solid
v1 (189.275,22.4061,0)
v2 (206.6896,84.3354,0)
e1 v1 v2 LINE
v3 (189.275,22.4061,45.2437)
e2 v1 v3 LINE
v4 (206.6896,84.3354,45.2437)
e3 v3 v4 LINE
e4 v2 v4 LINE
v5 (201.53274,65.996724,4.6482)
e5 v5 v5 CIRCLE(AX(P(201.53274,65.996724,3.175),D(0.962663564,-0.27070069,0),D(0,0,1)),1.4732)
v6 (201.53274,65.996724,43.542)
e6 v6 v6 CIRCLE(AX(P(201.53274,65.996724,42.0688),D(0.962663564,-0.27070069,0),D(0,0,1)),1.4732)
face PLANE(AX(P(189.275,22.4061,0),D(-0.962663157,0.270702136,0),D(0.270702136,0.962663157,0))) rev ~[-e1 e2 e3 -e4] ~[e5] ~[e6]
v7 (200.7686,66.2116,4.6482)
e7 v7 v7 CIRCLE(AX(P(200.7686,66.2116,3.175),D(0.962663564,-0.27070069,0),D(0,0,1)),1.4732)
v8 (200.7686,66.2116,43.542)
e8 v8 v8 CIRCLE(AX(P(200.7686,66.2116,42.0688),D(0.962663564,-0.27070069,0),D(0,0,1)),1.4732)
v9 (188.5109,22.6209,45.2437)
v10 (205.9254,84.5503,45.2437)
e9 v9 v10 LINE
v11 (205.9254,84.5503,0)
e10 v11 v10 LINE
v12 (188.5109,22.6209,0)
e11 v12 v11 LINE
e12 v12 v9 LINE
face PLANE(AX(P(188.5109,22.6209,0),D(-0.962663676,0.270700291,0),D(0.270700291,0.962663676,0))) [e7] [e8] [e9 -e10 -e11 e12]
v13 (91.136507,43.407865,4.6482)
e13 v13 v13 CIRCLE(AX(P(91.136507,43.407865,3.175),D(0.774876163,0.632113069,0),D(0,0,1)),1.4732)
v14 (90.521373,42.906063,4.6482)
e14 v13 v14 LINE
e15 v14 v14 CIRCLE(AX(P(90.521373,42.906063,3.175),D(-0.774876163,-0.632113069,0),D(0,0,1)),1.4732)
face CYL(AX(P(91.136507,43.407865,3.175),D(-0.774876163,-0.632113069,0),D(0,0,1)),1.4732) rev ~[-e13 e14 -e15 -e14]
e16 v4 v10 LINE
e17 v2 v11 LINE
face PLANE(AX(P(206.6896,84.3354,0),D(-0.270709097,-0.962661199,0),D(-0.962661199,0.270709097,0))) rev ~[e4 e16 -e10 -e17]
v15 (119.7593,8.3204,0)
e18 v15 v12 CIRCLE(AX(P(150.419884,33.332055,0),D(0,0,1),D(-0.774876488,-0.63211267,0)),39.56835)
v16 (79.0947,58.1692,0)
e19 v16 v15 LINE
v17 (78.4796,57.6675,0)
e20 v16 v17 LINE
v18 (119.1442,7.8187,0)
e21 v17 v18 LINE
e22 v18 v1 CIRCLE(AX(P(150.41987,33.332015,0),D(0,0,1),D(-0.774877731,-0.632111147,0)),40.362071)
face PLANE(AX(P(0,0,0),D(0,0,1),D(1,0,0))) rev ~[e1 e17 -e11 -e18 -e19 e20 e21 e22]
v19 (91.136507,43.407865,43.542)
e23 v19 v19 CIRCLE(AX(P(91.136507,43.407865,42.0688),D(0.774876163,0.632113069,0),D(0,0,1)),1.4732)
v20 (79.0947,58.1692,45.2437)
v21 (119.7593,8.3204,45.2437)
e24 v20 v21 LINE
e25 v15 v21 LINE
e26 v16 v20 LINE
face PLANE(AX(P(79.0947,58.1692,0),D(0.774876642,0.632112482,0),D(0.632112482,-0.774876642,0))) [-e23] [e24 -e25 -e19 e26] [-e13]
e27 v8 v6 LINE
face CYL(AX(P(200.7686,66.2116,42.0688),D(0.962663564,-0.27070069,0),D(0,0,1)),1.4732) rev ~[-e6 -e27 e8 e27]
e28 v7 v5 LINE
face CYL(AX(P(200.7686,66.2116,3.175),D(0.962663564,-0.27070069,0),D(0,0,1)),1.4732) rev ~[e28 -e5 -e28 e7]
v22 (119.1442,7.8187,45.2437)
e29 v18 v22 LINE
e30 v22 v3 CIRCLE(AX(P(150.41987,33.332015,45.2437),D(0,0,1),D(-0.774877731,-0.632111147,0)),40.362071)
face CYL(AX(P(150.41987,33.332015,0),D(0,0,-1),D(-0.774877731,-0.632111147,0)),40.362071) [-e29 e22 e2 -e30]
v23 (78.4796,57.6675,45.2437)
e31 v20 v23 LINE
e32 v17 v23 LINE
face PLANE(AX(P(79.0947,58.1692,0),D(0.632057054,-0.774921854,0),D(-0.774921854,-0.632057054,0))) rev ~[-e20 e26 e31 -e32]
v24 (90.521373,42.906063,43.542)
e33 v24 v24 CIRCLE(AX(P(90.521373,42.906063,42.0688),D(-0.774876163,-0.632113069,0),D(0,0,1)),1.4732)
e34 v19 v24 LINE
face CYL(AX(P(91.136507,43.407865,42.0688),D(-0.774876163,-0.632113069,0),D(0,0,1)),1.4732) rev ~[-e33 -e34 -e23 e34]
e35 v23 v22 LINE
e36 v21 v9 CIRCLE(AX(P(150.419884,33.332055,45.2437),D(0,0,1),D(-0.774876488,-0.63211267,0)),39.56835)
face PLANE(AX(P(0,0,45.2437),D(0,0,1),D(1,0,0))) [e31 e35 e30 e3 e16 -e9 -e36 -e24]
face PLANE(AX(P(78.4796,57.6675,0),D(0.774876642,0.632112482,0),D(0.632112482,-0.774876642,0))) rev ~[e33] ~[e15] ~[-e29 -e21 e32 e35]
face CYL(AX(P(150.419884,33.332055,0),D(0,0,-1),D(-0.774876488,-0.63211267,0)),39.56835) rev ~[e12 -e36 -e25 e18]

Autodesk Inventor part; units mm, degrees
ref_plane "YZ Plane" through (0, 0, 0) normal (1, 0, 0) x (0, 1, 0)
ref_plane "XZ Plane" through (0, 0, 0) normal (0, 1, 0) x (-1, 0, 0)
sketch "Main Outline" plane through (0, 0, 0) normal (0, 0, 1) x (1, 0, 0)
  line L0 (0, 0) -> (304.8, 0) construction
  line L1 (304.8, 0) -> (304.8, 50.8) construction
  line L2 (304.8, 50.8) -> (0, 50.8) construction
  line L3 (0, 50.8) -> (0, 0) construction
  line L4 (0, 50.8) -> (0, 53.34) construction
  line L5 (0, 53.34) -> (304.8, 53.34) construction
  line L6 (304.8, 53.34) -> (304.8, 50.8) construction
  circle A0 centre (152.4, 23.8125) radius 17.4625 construction
  line L7 (152.4, 23.8125) -> (152.4, 0) construction
  circle A1 centre (152.4, 23.8125) radius 27.94 construction
  circle A2 centre (152.4, 23.8125) radius 21.59 construction
  line L8 (152.4, 23.8125) -> (144.7964, 60.3681) construction
  circle A3 centre (144.7964, 60.3681) radius 15.24 construction
  circle A4 centre (144.7964, 60.3681) radius 8.89 construction
  circle A5 centre (144.7964, 60.3681) radius 14.2875 construction
  arc A6 (164.6591, 71.8014) -> (129.0153, 43.7486) centre (144.7964, 60.3681) ccw construction
  circle A7 centre (98.8106, 85.598) radius 32.258 construction
  circle A8 centre (126.6733, 147.4971) radius 32.258 construction
  circle A9 centre (176.9075, 101.8424) radius 32.258 construction
  circle A10 centre (144.7964, 60.3681) radius 11.1125 construction
  circle A11 centre (152.4, 23.8125) radius 49.53 construction
  line L9 (144.7964, 60.3681) -> (126.6733, 147.4971) construction
  line L10 (144.7964, 60.3681) -> (98.8106, 85.598) construction
  line L11 (98.8106, 85.598) -> (176.9075, 101.8424) construction
  line L12 (176.9075, 101.8424) -> (144.7964, 60.3681) construction
  circle A12 centre (98.8106, 85.598) radius 9.5493 construction
  arc A13 (174.9629, 111.1915) -> (185.6989, 98.1139) centre (176.9075, 101.8424) ccw construction
  circle A14 centre (126.6733, 147.4971) radius 9.5493 construction
  line L13 (96.8659, 94.9472) -> (174.9629, 111.1915) construction
  line L14 (185.6989, 98.1139) -> (165.8956, 51.4198) construction
  line L15 (92.2351, 78.6732) -> (129.0153, 43.7486) construction
  line L16 (174.9629, 111.1915) -> (176.9075, 101.8424) construction
  line L17 (176.9075, 101.8424) -> (185.6989, 98.1139) construction
  arc A15 (185.6989, 98.1139) -> (174.9629, 111.1915) centre (176.9075, 101.8424) ccw construction
  arc A16 (165.8956, 51.4198) -> (164.6591, 71.8014) centre (144.7964, 60.3681) ccw construction
  arc A17 (129.0153, 43.7486) -> (165.8956, 51.4198) centre (144.7964, 60.3681) ccw construction
  circle A18 centre (126.6086, 147.808) radius 32.258 construction
  circle A19 centre (126.544, 148.1188) radius 32.258 construction
  circle A20 centre (126.4793, 148.4297) radius 32.258 construction
  line L18 (126.6733, 147.4971) -> (126.4793, 148.4297) construction
  circle A21 centre (126.738, 147.1863) radius 32.258 construction
  circle A22 centre (117.4622, 43.2997) radius 9.525 construction
  circle A23 centre (176.6694, 55.615) radius 9.525 construction
  line L19 (152.4, 23.8125) -> (117.4622, 43.2997) construction
  line L20 (152.4, 23.8125) -> (176.6694, 55.615) construction
  line L21 (117.4622, 43.2997) -> (98.8106, 85.598) construction
  line L22 (176.6694, 55.615) -> (176.9075, 101.8424) construction
  circle A24 centre (135.1821, 106.5897) radius 7.9375 construction
  line L23 (135.6243, 150.8242) -> (166.2787, 68.353) construction
  circle A25 centre (152.4, 23.8125) radius 29.845 construction
  line L24 (117.1381, 146.979) -> (121.9118, 59.1246) construction
  circle A26 centre (99.0889, 85.4453) radius 32.258 construction
  circle A27 centre (97.9755, 86.0562) radius 32.258 construction
  line L25 (97.9755, 86.0562) -> (98.8106, 85.598) construction
  circle A28 centre (98.2538, 85.9034) radius 32.258 construction
  circle A29 centre (98.5322, 85.7507) radius 32.258 construction
  circle A30 centre (152.4, 23.8125) radius 29.845 construction
  circle A31 centre (122.555, 23.8125) radius 6.35 construction
  circle A32 centre (179.7696, 35.7133) radius 6.35 construction
  line L26 (122.555, 23.8125) -> (152.4, 23.8125) construction
  line L27 (152.4, 23.8125) -> (182.245, 23.8125) construction
  circle A33 centre (182.245, 23.8125) radius 6.35 construction
  circle A34 centre (125.0304, 11.9117) radius 6.35 construction
  circle A35 centre (150.4199, 33.3321) radius 39.5684 construction
  line L28 (72.9795, 65.6655) -> (119.7593, 8.3204) construction
  circle A36 centre (177.4906, 102.5955) radius 32.258 construction
  line L29 (176.9075, 101.8424) -> (177.4906, 102.5955) construction
  circle A37 centre (177.2963, 102.3445) radius 32.258 construction
  circle A38 centre (177.1019, 102.0934) radius 32.258 construction
  circle A39 centre (176.7131, 101.5913) radius 32.258 construction
  line L30 (188.5109, 22.6209) -> (208.5442, 93.8632) construction
  circle A40 centre (135.1821, 106.5897) radius 9.5727 construction
  arc A41 (86.8202, 116.3239) -> (96.3065, 136.4856) centre (81.3304, 131.2195) ccw construction
  arc A42 (158.9123, 149.5077) -> (175.6513, 134.801) centre (174.7462, 150.6502) ccw construction
  line L31 (126.4793, 148.4297) -> (126.9966, 145.9429) construction
  line L32 (116.5322, 146.3607) -> (117.0495, 143.8739) construction
  line L33 (136.9437, 148.0119) -> (136.4264, 150.4987) construction
  arc A43 (136.4264, 150.4987) -> (116.5322, 146.3607) centre (126.4793, 148.4297) ccw construction
  arc A44 (117.0495, 143.8739) -> (136.9437, 148.0119) centre (126.9966, 145.9429) ccw construction
  line L34 (177.4906, 102.5955) -> (175.9357, 100.5871) construction
  line L35 (169.4571, 108.8154) -> (167.9021, 106.807) construction
  line L36 (183.9692, 94.3672) -> (185.5242, 96.3756) construction
  arc A45 (185.5242, 96.3756) -> (169.4571, 108.8154) centre (177.4906, 102.5955) ccw construction
  arc A46 (167.9021, 106.807) -> (183.9692, 94.3672) centre (175.9357, 100.5871) ccw construction
  line L37 (97.9755, 86.0562) -> (100.2023, 84.8344) construction
  line L38 (93.0884, 77.1487) -> (95.3153, 75.927) construction
  line L39 (105.0894, 93.7418) -> (102.8625, 94.9636) construction
  arc A47 (102.8625, 94.9636) -> (93.0884, 77.1487) centre (97.9755, 86.0562) ccw construction
  arc A48 (95.3153, 75.927) -> (105.0894, 93.7418) centre (100.2023, 84.8344) ccw construction
  circle A49 centre (117.4622, 43.2997) radius 3.9687 construction
  circle A50 centre (176.6694, 55.615) radius 3.9687 construction
  line L40 (152.4, 23.8125) -> (158.4777, -5.4071) construction
  arc A51 (80.1751, 59.3139) -> (79.0947, 58.1692) centre (79.7097, 58.6709) ccw construction
  arc A52 (205.9254, 84.5503) -> (204.4781, 85.1692) centre (205.1613, 84.7652) ccw construction
  circle A53 centre (152.4, 23.8125) radius 14.224 construction
  circle A54 centre (135.1821, 106.5897) radius 3.9687 construction
  circle A55 centre (156.538, 3.9183) radius 6.35 construction
  circle A56 centre (156.538, 3.9183) radius 2.0828 construction
  circle A57 centre (152.4, 23.8125) radius 20.32 construction
  line L41 (133.1021, 30.1759) -> (152.4, 23.8125) construction
  line L42 (152.4, 23.8125) -> (167.5599, 37.3432) construction
  circle A58 centre (167.5599, 37.3432) radius 2.0828 construction
  circle A59 centre (167.5599, 37.3432) radius 3.9687 construction
  circle A60 centre (133.1021, 30.1759) radius 2.0828 construction
  circle A61 centre (133.1021, 30.1759) radius 3.9688 construction
  point P0 (126.738, 147.1863)
  point P1 (176.7131, 101.5913)
  dimension "d18" = 99.06
  dimension "d58" = 64.516
  dimension "d86" = 64.516
  dimension "d0" = 304.8
  dimension "d1" = 50.8
  dimension "d2" = 2.54
  dimension "d3" = 34.925
  dimension "d4" = 23.8125
  dimension "d5" = 152.4
  dimension "d6" = 55.88
  dimension "d7" = 43.18
  dimension "d8" = 37.338
  dimension "d10" = 30.48
  dimension "d11" = 17.78
  dimension "d12" = 28.575
  dimension "d13" = 45.8366
  dimension "d14" = 64.516
  dimension "d15" = 64.516
  dimension "d16" = 64.516
  dimension "d17" = 22.225
  dimension "d19" = 52.4523
  dimension "d20" = 88.9939
  dimension "d21" = 19.0986
  dimension "d22" = 19.0986
  dimension "d23" = 19.0986
  dimension "d30" = 124.732
  dimension "d40" = 64.516
  dimension "d41" = 64.516
  dimension "d42" = 64.516
  dimension "d43" = 0.9525
  dimension "d44" = 0.3175
  dimension "d45" = 0.635
  dimension "d46" = 64.516
  dimension "d47" = 0.3175
  dimension "d48" = 19.05
  dimension "d49" = 19.05
  dimension "d50" = 40.005
  dimension "d51" = 40.005
  dimension "d52" = 46.228
  dimension "d54" = 46.228
  dimension "d55" = 15.875
  dimension "d56" = 41.4655
  dimension "d57" = 59.69
  dimension "d59" = 64.516
  dimension "d60" = 64.516
  dimension "d61" = 64.516
  dimension "d62" = 0.3175
  dimension "d63" = 0.3175
  dimension "d64" = 0.635
  dimension "d65" = 0.9525
  dimension "d73" = 12.7
  dimension "d74" = 12.7
  dimension "d76" = 59.69
  dimension "d78" = 12.7
  dimension "d79" = 12.7
  dimension "d80" = 64.516
  dimension "d81" = 0.9525
  dimension "d82" = 64.516
  dimension "d83" = 64.516
  dimension "d84" = 0.3175
  dimension "d85" = 0.635
  dimension "d88" = 0.3175
  dimension "d89" = 31.75
  dimension "d90" = 31.75
  dimension "d94" = 1.5875
  dimension "d95" = 20.32
  dimension "d96" = 1.5875
sketch "Upper CIM C-C Check" plane through (0, 0, 0) normal (0, 0, 1) x (1, 0, 0)
  arc A0 (3.4429, -22.6582) -> (3.4429, 22.6582) centre (0, 0) ccw construction
  arc A1 (90.4285, 9.4409) -> (90.4285, -9.4409) centre (88.9939, 0) ccw construction
  line L0 (88.9939, 0) -> (0, 0) construction
  line L1 (90.4285, 9.4409) -> (3.4429, 22.6582)
  line L2 (3.4429, -22.6582) -> (90.4285, -9.4409)
  arc A2 (90.4285, -9.4409) -> (90.4285, 9.4409) centre (88.9939, 0) ccw
  arc A3 (3.4429, 22.6582) -> (3.4429, -22.6582) centre (0, 0) ccw
  dimension "d24" = 45.8366
  dimension "d25" = 19.0986
  dimension "d26" = 78.9119
  dimension "d27" = 87.984
  dimension "d28" = 27.12
  dimension "d29" = 88.9939
sketch "Sketch3" plane through (0, 0, 0) normal (0, 0, 1) x (1, 0, 0)
  arc A0 (80.1751, 59.3139) -> (79.0947, 58.1692) centre (79.7097, 58.6709) ccw construction
  line L0 (72.9795, 65.6655) -> (119.7593, 8.3204) construction
  circle A1 centre (150.4199, 33.3321) radius 39.5684 construction
  line L1 (188.5109, 22.6209) -> (208.5442, 93.8632) construction
  arc A2 (205.9254, 84.5503) -> (204.4781, 85.1692) centre (205.1613, 84.7652) ccw construction
  line L2 (79.0947, 58.1692) -> (119.7593, 8.3204)
  line L3 (188.5109, 22.6209) -> (205.9254, 84.5503)
  arc A3 (119.7593, 8.3204) -> (188.5109, 22.6209) centre (150.4199, 33.3321) ccw
  line L4 (78.4796, 57.6675) -> (119.1442, 7.8187)
  arc A4 (119.1442, 7.8187) -> (189.275, 22.4061) centre (150.4199, 33.3321) ccw
  line L5 (189.275, 22.4061) -> (206.6896, 84.3354)
  line L6 (79.0947, 58.1692) -> (78.4796, 57.6675)
  line L7 (206.6896, 84.3354) -> (205.9254, 84.5503)
  point P0 (0, 0)
  dimension "d115" = 0.7937
extrude "Extrusion1" add sketch "Sketch3" along normal blind 45.2437
ref_plane "Work Plane1" through (144.7964, 60.3681, 0) normal (0.9790451, 0.2036437, 0) x (-0.2036437, 0.9790451, 0)
sketch "Sketch4" plane through (188.5109, 22.6209, 0) normal (-0.9626636, 0.2707007, 0) x (0, 0, 1)
  line L0 (0, 0) -> (0, 64.3313) projected
  line L1 (0, 0) -> (45.2437, 0) projected
  line L2 (45.2437, 64.3313) -> (45.2437, 0) projected
  line L3 (0, 64.3313) -> (45.2437, 64.3313) projected
  line L4 (3.175, 64.3313) -> (3.175, 0)
  line L5 (42.0688, 64.3313) -> (42.0688, 0)
  point P0 (0, -72.8064)
  point P1 (3.175, 45.2813)
  point P2 (42.0688, 45.2813)
  dimension "d119" = 3.175
  dimension "d120" = 3.175
  dimension "d121" = 19.05
  dimension "d122" = 19.05
hole "Hole1" at (200.7686, 66.2116, 3.175) at (200.7686, 66.2116, 42.0688) direction (0.9626636, -0.2707007, 0) diameter 2.9464 end through all clearance for "Flat Head Machine Screw (82)" size "#4" standard "Ansi Unified Screw Threads"
mirror "Mirror1" about plane through (144.7964, 60.3681, 0) normal (0.9790451, 0.2036437, 0) of "Hole1"
sketch "Sketch6" plane through (0, 0, 45.2437) normal (0, 0, 1) x (1, 0, 0)
  line L0 (119.7593, 8.3204) -> (79.0947, 58.1692) projected
  line L1 (79.0947, 58.1692) -> (78.4796, 57.6675) projected
  line L2 (78.4796, 57.6675) -> (119.1442, 7.8187) projected
  arc A0 (119.1442, 7.8187) -> (189.275, 22.4061) centre (150.4199, 33.3321) ccw projected
  line L3 (189.275, 22.4061) -> (206.6896, 84.3354) projected
  line L4 (206.6896, 84.3354) -> (205.9254, 84.5503) projected
  line L5 (205.9254, 84.5503) -> (188.5109, 22.6209) projected
  arc A1 (119.7593, 8.3204) -> (188.5109, 22.6209) centre (150.4199, 33.3321) ccw projected
  line L6 (46.0816, -65.5817) -> (259.8786, -42.4203)
  point P0 (0, 0)
  dimension "d135" = 86.3855
  dimension "d136" = 64.3312
  dimension "d137" = 215.048
equation "\"d3\" = r10"
equation "\"d6\" = g44"
equation "\"d7\" = g34"
equation "\"d10\" = g24"
equation "\"d11\" = g14"
equation "\"d12\" = r8"
equation "\"d13\" = p48"
equation "\"d14\" = cim"
equation "\"d15\" = cim"
equation "\"d16\" = cim"
equation "\"d17\" = r6"
equation "\"d21\" = p20"
equation "\"d22\" = p20"
equation "\"d23\" = p20"
equation "\"d24\" = p48"
equation "\"d25\" = p20"
equation "\"d29\" = d20"
equation "\"g14\" = 17.78"
equation "\"g24\" = 30.48"
equation "\"g34\" = 43.18"
equation "\"g44\" = 55.88"
equation "\"p20\" = 19.09859"
equation "\"p48\" = 45.83662"
equation "\"r10\" = 34.925"
equation "\"r9\" = 31.75"
equation "\"r8\" = 28.575"
equation "\"r7\" = 25.4"
equation "\"r6\" = 22.225"
equation "\"r5\" = 19.05"
equation "\"r4\" = 15.875"
equation "\"r3\" = 12.7"
equation "\"cim\" = 64.516"
equation "\"act\" = 28.448"
equation "\"actL\" = 23.749"
equation "\"UpperCimCCCheck\" = 2 * d27 + d26 + d28"
equation "\"LowerBeltPathCCCheck\" = 267"
equation "\"SheildArc\" = 215.04798"
properties material "Aluminum 6061"
